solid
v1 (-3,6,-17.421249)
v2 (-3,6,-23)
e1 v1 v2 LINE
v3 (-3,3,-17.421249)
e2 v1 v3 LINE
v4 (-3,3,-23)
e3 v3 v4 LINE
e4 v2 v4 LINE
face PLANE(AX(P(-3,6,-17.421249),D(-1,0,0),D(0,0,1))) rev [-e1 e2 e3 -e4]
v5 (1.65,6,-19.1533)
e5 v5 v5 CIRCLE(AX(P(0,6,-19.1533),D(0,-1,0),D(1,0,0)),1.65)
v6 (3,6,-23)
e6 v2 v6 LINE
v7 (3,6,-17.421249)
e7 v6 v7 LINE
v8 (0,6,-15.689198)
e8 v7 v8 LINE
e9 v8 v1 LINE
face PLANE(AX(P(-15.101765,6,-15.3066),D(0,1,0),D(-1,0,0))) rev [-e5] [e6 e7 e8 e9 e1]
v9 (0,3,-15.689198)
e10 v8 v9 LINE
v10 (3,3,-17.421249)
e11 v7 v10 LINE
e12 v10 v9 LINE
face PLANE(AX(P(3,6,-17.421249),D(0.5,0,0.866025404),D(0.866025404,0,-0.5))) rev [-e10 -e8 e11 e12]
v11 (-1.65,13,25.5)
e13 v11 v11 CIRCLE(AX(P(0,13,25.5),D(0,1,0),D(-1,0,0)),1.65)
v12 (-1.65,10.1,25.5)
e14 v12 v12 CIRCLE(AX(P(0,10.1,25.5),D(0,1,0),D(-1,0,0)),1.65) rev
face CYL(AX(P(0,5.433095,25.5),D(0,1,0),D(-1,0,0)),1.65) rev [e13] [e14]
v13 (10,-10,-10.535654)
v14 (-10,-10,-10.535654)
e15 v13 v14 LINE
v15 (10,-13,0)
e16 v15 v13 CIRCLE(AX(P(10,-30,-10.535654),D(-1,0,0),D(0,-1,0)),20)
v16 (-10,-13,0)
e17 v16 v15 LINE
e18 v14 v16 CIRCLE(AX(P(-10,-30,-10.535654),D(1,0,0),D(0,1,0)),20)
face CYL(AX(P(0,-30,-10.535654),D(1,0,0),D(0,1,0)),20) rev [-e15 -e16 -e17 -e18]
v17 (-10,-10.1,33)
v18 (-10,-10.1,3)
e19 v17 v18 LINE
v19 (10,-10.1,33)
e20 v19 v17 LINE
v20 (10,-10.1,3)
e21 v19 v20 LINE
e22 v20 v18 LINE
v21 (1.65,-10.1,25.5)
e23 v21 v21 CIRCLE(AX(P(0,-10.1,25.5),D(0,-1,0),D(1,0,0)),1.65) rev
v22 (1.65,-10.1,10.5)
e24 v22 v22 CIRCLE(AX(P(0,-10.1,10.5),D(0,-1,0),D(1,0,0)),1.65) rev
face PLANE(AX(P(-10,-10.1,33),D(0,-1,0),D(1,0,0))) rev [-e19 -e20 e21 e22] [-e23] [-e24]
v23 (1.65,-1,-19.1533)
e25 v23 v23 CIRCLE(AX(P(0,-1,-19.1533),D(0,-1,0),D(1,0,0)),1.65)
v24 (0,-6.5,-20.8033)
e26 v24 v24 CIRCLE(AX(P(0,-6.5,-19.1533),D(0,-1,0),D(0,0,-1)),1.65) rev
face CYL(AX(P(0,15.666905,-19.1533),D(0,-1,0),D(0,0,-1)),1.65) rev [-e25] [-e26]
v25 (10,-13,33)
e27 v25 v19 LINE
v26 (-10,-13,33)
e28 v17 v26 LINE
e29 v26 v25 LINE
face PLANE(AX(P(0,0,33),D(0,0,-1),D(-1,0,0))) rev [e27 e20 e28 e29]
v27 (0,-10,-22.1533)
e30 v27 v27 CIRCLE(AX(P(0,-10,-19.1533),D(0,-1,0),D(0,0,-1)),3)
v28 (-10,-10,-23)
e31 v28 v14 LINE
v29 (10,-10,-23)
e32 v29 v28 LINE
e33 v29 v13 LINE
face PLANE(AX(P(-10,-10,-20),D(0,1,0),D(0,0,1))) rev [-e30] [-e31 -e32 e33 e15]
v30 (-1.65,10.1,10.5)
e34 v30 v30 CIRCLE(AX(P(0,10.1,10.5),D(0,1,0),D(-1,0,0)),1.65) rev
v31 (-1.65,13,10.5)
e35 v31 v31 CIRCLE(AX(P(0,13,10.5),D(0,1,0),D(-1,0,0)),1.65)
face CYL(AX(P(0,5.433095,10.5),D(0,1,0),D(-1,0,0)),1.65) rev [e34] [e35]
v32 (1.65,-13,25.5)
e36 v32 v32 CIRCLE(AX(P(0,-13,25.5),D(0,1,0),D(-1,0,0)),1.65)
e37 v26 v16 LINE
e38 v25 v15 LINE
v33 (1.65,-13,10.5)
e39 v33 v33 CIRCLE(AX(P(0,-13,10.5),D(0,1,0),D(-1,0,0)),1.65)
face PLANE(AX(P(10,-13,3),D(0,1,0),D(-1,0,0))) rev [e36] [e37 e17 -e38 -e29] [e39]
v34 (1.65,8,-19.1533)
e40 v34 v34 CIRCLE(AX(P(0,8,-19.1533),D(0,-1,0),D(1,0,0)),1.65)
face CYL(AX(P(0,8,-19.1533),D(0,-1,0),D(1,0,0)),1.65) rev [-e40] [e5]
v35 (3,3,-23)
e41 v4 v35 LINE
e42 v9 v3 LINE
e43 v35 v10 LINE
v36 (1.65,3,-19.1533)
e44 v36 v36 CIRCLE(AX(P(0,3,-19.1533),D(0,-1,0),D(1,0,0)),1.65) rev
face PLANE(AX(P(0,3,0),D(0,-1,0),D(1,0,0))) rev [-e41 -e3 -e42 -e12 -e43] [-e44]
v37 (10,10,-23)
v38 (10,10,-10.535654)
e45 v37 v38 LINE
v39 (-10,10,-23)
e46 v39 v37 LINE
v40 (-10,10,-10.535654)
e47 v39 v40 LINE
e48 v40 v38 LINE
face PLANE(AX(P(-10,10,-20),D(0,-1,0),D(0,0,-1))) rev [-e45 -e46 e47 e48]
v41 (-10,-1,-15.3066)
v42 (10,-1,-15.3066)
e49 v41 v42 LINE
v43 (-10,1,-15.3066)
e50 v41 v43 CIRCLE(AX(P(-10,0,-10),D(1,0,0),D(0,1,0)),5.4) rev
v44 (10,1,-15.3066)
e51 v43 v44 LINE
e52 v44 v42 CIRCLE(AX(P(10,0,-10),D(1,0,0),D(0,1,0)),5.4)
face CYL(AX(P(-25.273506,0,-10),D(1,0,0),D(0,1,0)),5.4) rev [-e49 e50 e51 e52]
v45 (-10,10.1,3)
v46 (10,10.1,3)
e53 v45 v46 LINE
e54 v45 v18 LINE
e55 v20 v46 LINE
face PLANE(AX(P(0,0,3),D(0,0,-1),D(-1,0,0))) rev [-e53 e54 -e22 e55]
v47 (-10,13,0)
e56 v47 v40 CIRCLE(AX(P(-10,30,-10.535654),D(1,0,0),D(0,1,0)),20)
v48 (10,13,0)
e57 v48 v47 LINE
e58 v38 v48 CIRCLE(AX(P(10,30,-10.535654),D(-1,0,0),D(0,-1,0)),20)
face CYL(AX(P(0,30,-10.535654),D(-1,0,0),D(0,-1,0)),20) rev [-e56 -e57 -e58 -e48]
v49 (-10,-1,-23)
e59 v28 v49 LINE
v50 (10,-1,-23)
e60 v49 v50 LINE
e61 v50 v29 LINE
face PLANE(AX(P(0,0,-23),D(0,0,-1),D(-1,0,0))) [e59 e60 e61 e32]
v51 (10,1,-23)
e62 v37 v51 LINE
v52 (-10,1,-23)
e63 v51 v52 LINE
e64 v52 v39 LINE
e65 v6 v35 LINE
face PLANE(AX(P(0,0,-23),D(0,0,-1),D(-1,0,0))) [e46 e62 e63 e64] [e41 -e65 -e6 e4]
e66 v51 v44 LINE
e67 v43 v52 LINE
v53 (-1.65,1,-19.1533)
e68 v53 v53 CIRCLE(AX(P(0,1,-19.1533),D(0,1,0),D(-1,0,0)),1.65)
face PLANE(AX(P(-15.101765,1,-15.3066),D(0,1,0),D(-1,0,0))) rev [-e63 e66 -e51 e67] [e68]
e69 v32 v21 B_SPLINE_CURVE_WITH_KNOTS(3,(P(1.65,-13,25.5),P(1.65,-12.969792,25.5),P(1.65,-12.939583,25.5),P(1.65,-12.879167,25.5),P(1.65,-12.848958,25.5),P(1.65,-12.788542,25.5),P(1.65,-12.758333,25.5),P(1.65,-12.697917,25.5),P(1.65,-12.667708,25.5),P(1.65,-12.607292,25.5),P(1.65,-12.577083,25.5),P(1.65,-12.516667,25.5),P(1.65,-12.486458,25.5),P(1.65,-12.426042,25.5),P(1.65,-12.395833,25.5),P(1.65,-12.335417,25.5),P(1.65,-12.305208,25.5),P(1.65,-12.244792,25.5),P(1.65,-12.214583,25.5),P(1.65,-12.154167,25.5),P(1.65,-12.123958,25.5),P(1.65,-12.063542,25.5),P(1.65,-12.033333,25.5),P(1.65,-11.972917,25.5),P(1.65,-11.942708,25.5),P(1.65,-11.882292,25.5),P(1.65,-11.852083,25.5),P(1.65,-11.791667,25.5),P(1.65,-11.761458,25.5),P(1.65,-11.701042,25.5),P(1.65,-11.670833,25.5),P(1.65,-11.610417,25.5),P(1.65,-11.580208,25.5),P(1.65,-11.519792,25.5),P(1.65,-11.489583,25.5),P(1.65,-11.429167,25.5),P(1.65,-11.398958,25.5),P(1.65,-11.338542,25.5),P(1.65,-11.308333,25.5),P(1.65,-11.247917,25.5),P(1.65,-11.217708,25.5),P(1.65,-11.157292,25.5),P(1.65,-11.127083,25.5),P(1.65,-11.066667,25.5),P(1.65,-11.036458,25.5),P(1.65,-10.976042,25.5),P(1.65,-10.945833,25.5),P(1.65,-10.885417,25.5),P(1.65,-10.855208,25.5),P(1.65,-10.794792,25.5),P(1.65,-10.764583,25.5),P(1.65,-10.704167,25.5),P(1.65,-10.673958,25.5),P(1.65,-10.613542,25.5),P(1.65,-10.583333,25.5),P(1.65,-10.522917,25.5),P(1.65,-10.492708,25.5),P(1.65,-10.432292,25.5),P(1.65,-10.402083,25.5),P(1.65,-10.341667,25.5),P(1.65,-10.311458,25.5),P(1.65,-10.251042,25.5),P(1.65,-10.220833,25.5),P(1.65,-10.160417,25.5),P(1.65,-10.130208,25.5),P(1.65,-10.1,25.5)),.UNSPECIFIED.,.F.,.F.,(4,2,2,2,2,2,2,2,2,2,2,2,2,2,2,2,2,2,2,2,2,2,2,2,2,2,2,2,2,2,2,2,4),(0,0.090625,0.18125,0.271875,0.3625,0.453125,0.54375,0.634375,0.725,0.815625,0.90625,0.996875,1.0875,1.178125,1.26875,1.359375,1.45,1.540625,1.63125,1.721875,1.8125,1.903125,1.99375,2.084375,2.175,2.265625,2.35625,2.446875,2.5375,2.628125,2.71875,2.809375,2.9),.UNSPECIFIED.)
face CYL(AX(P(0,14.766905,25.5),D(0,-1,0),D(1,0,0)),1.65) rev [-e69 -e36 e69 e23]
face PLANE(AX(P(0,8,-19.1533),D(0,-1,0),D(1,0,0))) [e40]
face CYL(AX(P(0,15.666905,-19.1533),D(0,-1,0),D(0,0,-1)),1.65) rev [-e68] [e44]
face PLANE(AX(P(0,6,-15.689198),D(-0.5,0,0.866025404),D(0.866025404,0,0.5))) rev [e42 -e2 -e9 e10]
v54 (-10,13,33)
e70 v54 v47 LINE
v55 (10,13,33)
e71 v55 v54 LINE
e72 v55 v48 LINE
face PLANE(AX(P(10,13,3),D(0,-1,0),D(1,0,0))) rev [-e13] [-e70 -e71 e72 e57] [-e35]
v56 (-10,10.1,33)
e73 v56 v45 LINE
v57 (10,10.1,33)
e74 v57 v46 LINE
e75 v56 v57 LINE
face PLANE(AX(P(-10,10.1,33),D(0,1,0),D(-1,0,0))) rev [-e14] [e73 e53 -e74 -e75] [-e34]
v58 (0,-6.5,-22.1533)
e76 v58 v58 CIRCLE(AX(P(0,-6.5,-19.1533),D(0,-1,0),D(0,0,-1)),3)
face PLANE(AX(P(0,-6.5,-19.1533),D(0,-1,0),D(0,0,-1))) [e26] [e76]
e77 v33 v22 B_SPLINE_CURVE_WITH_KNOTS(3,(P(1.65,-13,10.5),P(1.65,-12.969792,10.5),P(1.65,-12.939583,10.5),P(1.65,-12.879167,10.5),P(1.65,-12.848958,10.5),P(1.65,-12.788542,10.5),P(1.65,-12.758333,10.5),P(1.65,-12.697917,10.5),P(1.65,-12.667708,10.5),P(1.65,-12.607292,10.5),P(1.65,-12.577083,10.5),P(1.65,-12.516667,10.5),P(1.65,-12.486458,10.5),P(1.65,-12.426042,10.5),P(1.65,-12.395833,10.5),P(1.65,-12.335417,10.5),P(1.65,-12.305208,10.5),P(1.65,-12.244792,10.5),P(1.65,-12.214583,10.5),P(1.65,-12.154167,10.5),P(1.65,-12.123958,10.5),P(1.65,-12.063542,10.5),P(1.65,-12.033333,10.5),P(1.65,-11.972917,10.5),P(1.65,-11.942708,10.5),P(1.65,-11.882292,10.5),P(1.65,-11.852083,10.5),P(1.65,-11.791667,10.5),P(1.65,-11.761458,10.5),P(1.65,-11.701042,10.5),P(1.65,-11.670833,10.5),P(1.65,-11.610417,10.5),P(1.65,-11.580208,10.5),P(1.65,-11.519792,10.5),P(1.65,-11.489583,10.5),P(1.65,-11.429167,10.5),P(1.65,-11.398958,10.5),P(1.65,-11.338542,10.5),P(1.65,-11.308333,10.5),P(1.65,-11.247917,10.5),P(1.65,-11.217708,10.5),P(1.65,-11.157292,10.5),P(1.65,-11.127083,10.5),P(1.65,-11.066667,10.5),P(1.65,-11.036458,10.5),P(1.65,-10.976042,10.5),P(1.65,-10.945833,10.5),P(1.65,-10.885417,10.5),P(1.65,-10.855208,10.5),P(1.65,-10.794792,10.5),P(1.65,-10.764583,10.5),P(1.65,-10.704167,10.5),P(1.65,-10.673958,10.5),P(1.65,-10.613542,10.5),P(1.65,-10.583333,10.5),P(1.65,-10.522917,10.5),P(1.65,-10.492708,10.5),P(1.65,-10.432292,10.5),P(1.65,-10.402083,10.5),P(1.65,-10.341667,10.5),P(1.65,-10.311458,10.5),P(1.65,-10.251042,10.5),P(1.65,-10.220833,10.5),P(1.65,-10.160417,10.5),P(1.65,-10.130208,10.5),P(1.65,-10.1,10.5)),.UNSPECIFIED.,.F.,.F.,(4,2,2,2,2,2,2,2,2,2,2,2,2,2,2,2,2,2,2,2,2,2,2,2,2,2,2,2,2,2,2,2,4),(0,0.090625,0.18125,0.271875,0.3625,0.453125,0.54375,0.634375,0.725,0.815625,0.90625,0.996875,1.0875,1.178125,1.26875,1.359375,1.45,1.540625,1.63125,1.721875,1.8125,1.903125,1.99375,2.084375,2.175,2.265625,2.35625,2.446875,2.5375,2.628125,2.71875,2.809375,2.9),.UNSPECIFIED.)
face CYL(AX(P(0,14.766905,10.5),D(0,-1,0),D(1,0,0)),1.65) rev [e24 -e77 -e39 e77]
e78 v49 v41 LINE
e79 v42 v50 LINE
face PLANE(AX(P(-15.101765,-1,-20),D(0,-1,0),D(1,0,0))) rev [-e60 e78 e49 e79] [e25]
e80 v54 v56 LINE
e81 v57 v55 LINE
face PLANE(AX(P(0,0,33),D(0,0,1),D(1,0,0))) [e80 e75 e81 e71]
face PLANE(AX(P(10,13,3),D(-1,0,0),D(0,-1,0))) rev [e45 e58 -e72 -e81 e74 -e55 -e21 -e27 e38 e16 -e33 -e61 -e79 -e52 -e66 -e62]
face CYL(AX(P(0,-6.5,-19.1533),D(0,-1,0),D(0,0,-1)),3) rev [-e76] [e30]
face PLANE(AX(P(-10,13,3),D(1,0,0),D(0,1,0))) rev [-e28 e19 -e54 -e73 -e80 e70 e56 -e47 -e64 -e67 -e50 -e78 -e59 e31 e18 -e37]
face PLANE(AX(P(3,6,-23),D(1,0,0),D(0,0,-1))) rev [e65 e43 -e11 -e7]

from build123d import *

# Parameters (mm, degrees)
SKETCH_2_W          = 20
SKETCH_2_H          = 26
EXTRUDE_1_DEPTH     = 3
SKETCH_3_W          = 20
SKETCH_3_H          = 2.9
EXTRUDE_2_DEPTH     = 30
SKETCH_4_R          = 1.65
CUT_EXTRUDE_1_DEPTH = 23.1
SKETCH_5_W          = 20
SKETCH_5_H          = 20
EXTRUDE_3_DEPTH     = 20
SKETCH_6_R          = 5.4
CUT_EXTRUDE_2_DEPTH = 20
CUT_EXTRUDE_3_DEPTH = 20
SKETCH_8_W          = 20
SKETCH_8_H          = 9
EXTRUDE_4_DEPTH     = 3
SKETCH_9_R          = 1.65
CUT_EXTRUDE_4_DEPTH = 16
SKETCH_10_R         = 3
CUT_EXTRUDE_5_DEPTH = 3.5
CUT_EXTRUDE_START   = -2
CUT_EXTRUDE_6_DEPTH = 3
SKETCH_12_R         = 1.65
CUT_EXTRUDE_7_DEPTH = 2
FILLET_1_R          = 20


with BuildPart() as part:
    # Эскиз2 → Бобышка-Вытянуть1 (new body)
    with BuildSketch(Plane.XY):
        Rectangle(SKETCH_2_W, SKETCH_2_H)
    extrude(amount=EXTRUDE_1_DEPTH)

    # Эскиз3 → Бобышка-Вытянуть2 (add)
    with BuildSketch(Plane.XY.offset(3)):
        with Locations((0, 11.55)):
            Rectangle(SKETCH_3_W, SKETCH_3_H)
        with Locations((0, -11.55)):
            Rectangle(SKETCH_3_W, SKETCH_3_H)
    extrude(amount=EXTRUDE_2_DEPTH)

    # Эскиз4 → Вырез-Вытянуть1 (cut)
    with BuildSketch(Plane(origin=(0, 13, 0), x_dir=(1, 0, 0), z_dir=(0, 1, 0))):
        with Locations(Location((0, -10.5, 0), (0, 0, 180))):
            Circle(SKETCH_4_R)
        with Locations(Location((0, -25.5, 0), (0, 0, 180))):
            Circle(SKETCH_4_R)
    cut_extrude_1 = extrude(amount=-CUT_EXTRUDE_1_DEPTH, mode=Mode.SUBTRACT)

    # Зеркальное отражение1: Вырез-Вытянуть1 across plane
    add(cut_extrude_1.mirror(Plane.ZX), mode=Mode.SUBTRACT)

    # Эскиз5 → Бобышка-Вытянуть3 (add)
    with BuildSketch(Plane(origin=(0, 0, 0), x_dir=(-1, 0, 0), z_dir=(0, 0, -1))):
        Rectangle(SKETCH_5_W, SKETCH_5_H)
    extrude(amount=EXTRUDE_3_DEPTH)

    # Эскиз6 → Вырез-Вытянуть2 (cut)
    with BuildSketch(Plane(origin=(10, 0, 0), x_dir=(0, 0, -1), z_dir=(1, 0, 0))):
        with Locations(Location((10, 0, 0), (0, 0, 90))):
            Circle(SKETCH_6_R)
    extrude(amount=-CUT_EXTRUDE_2_DEPTH, mode=Mode.SUBTRACT)

    # Эскиз7 → Вырез-Вытянуть3 (cut)
    with BuildSketch(Plane(origin=(10, 0, 0), x_dir=(0, 0, -1), z_dir=(1, 0, 0))):
        with BuildLine():
            Line((15.306599665, 1), (20, 1))
            Line((20, 1), (20, -1))
            Line((20, -1), (15.306599665, -1))
            ThreePointArc((15.306599665, -1), (15.4, 0), (15.306599665, 1))
        make_face()
    extrude(amount=-CUT_EXTRUDE_3_DEPTH, mode=Mode.SUBTRACT)

    # Эскиз8 → Бобышка-Вытянуть4 (add)
    with BuildSketch(Plane(origin=(0, 0, -20), x_dir=(-1, 0, 0), z_dir=(0, 0, -1))):
        with Locations((0, 5.5)):
            Rectangle(SKETCH_8_W, SKETCH_8_H)
        with Locations((0, -5.5)):
            Rectangle(SKETCH_8_W, SKETCH_8_H)
    extrude(amount=EXTRUDE_4_DEPTH)

    # Эскиз9 → Вырез-Вытянуть4 (cut)
    with BuildSketch(Plane.XZ.offset(10)):
        with Locations(Location((0, -19.153299832, 0), (0, 0, 270))):
            Circle(SKETCH_9_R)
    extrude(amount=-CUT_EXTRUDE_4_DEPTH, mode=Mode.SUBTRACT)

    # Эскиз10 → Вырез-Вытянуть5 (cut)
    with BuildSketch(Plane.XZ.offset(10)):
        with Locations(Location((0, -19.153299832, 0), (0, 0, 270))):
            Circle(SKETCH_10_R)
    extrude(amount=-CUT_EXTRUDE_5_DEPTH, mode=Mode.SUBTRACT)

    # Эскиз11 → Вырез-Вытянуть6 (cut)
    with BuildSketch(Plane.XZ.offset(-1).offset(CUT_EXTRUDE_START)):
        Polygon((3, -23), (3, -17.421249025), (0, -15.689198217), (-3, -17.421249025), (-3, -23), align=None)
    extrude(amount=-CUT_EXTRUDE_6_DEPTH, mode=Mode.SUBTRACT)

    # Эскиз12 → Вырез-Вытянуть7 (cut)
    with BuildSketch(Plane.XZ.offset(-6)):
        with Locations(Location((0, -19.153299832, 0), (0, 0, 270))):
            Circle(SKETCH_12_R)
    extrude(amount=-CUT_EXTRUDE_7_DEPTH, mode=Mode.SUBTRACT)

    # Скругление1
    # the kernel refuses this fillet: 20 mm, written as the material it adds along each edge
    with BuildSketch(Plane(origin=(10, -10, 0), x_dir=(0, 0, -1), z_dir=(-1, 0, 0))) as fillet_1_piece_1:
        with BuildLine():
            CenterArc((10.535653753, 20), FILLET_1_R, 238.211669383, 31.788330617)
            Line((0, 3), (0, 0))
            Line((0, 0), (10.535653753, 0))
        make_face()
    extrude(amount=20)
    with BuildSketch(Plane(origin=(-10, 10, 0), x_dir=(0, 1, 0), z_dir=(1, 0, 0))) as fillet_1_piece_2:
        with BuildLine():
            CenterArc((20, -10.535653753), FILLET_1_R, 148.211669383, 31.788330617)
            Line((0, -10.535653753), (0, 0))
            Line((0, 0), (3, 0))
        make_face()
    extrude(amount=20)


solid = part.part
